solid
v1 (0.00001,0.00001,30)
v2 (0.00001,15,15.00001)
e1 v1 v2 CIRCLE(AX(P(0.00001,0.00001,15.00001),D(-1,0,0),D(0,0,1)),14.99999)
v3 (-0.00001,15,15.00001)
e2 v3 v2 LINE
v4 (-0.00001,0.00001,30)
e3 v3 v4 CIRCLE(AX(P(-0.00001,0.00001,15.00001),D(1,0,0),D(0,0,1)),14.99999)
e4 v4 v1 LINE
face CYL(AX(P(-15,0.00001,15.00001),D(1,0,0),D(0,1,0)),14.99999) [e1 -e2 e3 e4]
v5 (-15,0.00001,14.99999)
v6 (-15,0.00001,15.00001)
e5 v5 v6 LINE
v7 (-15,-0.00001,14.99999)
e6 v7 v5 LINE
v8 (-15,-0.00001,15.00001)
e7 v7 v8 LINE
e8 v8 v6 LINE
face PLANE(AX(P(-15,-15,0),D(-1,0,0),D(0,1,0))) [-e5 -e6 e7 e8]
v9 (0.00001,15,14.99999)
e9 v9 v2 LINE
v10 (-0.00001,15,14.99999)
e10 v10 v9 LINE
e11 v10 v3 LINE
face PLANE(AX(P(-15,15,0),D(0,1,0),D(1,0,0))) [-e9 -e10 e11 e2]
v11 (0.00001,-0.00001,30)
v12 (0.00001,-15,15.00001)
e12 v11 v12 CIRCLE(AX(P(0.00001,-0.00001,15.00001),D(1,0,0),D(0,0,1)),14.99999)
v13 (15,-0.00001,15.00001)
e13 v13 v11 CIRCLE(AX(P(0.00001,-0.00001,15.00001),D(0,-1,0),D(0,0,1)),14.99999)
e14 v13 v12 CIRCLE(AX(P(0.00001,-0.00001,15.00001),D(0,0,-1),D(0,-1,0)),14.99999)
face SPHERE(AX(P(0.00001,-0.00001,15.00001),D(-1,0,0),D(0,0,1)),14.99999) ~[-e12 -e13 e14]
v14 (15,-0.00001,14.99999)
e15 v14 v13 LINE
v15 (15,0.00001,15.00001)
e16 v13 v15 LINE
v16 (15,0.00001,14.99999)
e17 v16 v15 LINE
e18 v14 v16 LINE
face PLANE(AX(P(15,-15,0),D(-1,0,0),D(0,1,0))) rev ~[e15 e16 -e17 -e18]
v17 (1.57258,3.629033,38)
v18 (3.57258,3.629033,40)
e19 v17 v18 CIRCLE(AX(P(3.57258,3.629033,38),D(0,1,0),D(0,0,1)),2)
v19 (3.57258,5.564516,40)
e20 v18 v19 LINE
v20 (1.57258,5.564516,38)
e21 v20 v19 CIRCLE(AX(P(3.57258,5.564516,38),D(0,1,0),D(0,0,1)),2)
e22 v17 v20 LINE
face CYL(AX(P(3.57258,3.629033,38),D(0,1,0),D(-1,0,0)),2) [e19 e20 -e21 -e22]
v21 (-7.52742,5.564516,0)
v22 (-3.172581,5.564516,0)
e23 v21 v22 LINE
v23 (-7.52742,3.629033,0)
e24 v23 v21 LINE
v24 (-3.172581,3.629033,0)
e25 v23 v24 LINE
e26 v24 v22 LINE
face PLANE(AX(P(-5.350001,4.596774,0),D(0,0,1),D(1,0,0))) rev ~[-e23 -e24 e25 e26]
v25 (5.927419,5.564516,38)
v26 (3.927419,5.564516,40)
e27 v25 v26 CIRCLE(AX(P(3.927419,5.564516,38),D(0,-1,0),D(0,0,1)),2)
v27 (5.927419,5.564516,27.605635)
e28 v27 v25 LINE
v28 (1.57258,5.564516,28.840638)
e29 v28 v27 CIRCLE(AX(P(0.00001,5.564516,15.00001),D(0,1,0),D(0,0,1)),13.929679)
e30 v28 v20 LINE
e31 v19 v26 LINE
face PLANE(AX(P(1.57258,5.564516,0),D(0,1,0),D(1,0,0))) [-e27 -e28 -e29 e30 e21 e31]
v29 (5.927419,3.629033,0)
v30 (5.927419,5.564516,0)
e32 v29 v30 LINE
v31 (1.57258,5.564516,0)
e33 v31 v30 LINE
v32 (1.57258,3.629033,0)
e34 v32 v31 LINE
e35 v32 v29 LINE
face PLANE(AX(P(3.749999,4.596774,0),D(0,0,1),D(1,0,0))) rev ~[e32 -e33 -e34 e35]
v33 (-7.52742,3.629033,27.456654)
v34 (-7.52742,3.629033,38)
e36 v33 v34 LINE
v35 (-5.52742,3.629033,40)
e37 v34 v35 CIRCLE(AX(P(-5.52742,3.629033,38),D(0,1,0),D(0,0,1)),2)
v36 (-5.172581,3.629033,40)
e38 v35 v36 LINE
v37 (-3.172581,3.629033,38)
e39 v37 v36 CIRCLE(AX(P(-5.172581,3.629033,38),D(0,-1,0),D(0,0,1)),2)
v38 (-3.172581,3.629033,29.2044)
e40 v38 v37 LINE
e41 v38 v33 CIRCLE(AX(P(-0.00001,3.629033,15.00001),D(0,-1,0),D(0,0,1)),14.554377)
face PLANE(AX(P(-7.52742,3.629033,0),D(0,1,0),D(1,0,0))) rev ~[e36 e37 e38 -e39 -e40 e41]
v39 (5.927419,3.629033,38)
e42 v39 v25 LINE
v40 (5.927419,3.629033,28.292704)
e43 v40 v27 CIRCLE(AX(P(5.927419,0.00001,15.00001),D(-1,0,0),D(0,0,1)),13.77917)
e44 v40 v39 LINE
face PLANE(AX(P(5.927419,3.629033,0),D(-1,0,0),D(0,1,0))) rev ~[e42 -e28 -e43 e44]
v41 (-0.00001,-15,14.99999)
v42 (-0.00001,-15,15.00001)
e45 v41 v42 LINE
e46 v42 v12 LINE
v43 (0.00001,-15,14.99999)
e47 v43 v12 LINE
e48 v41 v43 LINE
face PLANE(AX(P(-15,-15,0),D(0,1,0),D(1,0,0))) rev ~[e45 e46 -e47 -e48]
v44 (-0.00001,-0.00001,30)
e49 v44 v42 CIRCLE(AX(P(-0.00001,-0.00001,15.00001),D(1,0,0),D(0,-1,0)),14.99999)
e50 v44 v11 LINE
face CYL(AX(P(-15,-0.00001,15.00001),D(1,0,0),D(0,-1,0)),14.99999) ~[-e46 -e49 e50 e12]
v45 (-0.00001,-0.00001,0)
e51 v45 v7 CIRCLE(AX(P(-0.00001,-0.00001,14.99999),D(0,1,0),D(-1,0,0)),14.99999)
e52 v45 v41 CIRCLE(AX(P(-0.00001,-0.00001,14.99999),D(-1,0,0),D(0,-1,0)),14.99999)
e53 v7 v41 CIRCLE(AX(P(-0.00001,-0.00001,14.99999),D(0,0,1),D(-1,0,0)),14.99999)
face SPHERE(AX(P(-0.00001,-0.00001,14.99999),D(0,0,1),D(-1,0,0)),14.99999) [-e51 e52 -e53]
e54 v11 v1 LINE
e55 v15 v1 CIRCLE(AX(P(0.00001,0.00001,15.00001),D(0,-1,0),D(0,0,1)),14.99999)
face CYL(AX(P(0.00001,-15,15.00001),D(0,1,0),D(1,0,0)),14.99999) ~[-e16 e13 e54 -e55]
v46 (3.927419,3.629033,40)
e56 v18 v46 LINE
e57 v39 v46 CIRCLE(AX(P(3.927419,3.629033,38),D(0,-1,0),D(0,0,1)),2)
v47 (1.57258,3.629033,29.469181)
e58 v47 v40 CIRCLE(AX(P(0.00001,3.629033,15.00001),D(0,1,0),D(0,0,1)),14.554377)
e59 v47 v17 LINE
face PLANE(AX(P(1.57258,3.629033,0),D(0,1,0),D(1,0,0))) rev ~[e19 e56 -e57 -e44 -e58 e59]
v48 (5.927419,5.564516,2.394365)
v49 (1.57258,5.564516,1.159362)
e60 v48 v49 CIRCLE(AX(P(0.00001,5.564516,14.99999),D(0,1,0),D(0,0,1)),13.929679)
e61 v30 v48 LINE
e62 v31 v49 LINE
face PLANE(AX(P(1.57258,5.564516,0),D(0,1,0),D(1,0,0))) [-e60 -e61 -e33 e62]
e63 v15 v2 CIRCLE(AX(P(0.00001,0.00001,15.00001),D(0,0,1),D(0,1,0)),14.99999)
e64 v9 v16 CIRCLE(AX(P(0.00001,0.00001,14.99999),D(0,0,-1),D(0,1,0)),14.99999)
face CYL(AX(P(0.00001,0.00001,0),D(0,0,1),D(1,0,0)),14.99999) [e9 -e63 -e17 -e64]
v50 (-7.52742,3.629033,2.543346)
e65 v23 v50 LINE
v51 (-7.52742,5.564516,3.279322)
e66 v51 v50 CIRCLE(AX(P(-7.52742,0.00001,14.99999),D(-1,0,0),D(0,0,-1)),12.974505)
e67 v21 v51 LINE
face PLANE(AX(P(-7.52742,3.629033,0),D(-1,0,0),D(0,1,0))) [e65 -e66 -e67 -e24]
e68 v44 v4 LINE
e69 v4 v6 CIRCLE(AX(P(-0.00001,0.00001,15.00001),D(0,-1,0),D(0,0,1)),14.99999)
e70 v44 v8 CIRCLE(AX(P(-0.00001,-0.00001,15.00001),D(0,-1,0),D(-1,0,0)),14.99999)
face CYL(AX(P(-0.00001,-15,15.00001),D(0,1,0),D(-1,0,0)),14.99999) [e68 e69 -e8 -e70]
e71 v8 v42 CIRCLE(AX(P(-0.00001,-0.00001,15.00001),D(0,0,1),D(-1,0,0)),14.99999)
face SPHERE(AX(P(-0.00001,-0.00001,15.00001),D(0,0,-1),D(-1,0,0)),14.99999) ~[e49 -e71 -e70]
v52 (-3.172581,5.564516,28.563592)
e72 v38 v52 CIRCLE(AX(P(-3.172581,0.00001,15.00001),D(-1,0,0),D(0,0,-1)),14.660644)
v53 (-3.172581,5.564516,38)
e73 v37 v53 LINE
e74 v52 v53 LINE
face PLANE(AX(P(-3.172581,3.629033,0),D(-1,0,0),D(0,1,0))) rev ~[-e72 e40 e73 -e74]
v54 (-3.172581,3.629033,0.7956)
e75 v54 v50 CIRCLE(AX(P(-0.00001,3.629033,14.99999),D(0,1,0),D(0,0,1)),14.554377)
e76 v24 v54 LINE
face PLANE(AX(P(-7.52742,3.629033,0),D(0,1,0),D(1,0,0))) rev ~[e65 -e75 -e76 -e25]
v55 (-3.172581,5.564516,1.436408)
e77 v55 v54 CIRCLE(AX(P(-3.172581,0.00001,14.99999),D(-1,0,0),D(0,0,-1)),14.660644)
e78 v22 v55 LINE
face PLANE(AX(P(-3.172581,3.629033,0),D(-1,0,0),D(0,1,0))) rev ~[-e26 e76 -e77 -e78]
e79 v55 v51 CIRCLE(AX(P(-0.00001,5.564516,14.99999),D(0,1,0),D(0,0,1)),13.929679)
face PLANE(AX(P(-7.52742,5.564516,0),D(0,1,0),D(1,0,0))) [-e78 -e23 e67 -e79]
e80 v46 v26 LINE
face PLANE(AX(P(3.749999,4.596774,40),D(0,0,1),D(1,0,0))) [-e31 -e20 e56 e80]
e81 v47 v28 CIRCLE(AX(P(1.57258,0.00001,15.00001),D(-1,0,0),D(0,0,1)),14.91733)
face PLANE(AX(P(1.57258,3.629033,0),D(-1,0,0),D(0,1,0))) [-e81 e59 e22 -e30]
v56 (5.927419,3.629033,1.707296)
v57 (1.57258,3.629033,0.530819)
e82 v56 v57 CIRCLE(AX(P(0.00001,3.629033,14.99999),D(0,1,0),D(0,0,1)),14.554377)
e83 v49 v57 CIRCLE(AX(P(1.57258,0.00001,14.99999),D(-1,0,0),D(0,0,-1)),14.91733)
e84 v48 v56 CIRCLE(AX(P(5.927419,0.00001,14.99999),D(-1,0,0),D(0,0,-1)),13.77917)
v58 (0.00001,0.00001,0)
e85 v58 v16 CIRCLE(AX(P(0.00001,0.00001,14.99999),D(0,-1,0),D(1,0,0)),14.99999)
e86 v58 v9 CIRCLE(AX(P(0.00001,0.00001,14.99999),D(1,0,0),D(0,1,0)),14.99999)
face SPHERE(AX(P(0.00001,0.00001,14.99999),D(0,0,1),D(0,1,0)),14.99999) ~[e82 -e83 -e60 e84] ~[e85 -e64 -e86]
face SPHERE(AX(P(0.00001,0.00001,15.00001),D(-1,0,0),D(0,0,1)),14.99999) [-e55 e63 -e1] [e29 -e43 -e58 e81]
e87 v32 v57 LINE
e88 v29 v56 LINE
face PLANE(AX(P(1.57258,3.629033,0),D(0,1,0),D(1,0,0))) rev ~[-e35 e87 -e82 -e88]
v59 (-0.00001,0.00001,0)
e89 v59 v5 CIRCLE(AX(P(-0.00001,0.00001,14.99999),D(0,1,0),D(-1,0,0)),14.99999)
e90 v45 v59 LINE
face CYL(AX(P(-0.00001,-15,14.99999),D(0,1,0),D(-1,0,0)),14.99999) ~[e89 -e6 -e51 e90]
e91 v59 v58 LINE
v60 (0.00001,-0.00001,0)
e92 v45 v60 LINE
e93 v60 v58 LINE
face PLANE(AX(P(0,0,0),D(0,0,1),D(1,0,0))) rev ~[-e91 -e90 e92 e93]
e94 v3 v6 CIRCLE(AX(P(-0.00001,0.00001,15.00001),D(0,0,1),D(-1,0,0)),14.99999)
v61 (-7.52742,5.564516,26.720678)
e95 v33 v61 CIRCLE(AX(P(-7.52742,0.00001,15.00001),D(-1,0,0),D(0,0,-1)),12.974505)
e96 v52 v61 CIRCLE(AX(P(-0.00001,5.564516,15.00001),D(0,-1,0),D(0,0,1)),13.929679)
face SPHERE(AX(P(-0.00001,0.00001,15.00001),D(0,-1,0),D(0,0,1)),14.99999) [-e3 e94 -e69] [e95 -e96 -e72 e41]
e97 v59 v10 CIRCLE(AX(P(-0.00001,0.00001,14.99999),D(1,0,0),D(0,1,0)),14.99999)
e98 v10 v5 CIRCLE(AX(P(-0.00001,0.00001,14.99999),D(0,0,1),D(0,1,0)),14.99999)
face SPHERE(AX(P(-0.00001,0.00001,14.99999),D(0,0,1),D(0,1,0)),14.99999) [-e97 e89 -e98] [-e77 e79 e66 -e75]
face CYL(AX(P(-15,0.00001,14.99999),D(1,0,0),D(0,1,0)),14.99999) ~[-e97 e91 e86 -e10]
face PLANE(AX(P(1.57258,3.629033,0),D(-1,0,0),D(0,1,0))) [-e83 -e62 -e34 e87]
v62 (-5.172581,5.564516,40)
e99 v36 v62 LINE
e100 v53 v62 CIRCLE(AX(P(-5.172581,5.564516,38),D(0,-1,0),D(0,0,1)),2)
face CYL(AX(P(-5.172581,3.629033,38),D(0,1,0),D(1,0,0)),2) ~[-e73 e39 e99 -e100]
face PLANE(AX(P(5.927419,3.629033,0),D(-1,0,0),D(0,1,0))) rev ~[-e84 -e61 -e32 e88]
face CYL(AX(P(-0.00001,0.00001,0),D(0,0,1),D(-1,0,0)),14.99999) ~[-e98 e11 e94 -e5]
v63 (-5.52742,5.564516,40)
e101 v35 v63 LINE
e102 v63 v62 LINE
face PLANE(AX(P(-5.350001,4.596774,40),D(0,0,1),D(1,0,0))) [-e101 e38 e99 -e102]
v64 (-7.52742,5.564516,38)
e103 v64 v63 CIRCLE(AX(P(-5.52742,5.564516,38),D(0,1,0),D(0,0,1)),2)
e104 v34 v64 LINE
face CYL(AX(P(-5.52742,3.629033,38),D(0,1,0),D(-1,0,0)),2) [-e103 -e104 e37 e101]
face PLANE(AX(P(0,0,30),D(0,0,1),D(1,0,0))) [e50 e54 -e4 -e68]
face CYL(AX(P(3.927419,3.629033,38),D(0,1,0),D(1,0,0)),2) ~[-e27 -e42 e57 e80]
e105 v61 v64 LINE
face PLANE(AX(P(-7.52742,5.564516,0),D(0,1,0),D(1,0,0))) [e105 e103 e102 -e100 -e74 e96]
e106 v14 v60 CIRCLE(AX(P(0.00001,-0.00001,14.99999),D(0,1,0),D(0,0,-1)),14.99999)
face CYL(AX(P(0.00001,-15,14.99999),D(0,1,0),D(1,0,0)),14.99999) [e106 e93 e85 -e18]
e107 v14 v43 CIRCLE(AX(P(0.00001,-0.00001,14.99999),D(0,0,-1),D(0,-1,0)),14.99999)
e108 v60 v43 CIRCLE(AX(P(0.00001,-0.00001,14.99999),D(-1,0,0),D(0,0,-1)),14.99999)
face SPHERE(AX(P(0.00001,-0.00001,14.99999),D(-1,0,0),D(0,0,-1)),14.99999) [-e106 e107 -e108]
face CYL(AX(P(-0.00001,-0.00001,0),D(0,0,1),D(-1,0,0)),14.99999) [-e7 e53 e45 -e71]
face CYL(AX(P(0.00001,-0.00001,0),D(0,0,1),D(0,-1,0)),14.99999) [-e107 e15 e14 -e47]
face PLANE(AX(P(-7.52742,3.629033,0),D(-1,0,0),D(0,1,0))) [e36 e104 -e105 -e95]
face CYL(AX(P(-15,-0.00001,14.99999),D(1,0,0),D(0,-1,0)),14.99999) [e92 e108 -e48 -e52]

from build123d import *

# Parameters (mm, degrees)
F0_W     = 30
F0_H     = 30
F1_DEPTH = 30
F2_R     = 14.99999
F3_W     = 4.3548396789
F3_H     = 1.9354838878
F4_DEPTH = 40
F5_R     = 2


# Not quite as in the source:
# - a fillet or chamfer is up to 0.001 mm smaller than in the source, because OpenCascade refuses the exact size
# - the program builds the solid bodies; features that only make, move or delete a surface that nothing else refers to are left out


with BuildPart() as f1:
    # F0 (on Top) → F1 (new body)
    with BuildSketch(Plane.XY):
        Rectangle(F0_W, F0_H)
    extrude(amount=F1_DEPTH)

    # F2 (radius 15 in the source; OpenCascade refuses exactly that, so slightly less here)
    f2_edges = [f1.edges().sort_by_distance(p)[0] for p in [
        (-15, -15, 15),
        (-15, 0, 30),
        (0, -15, 30),
        (0, 15, 30),
        (15, 0, 30),
        (15, 15, 15),
        (-15, 15, 15),
        (0, 15, 0),
        (-15, 0, 0),
        (0, -15, 0),
        (15, 0, 0),
        (15, -15, 15),
    ]]
    fillet(f2_edges, radius=F2_R)

    # F3 (on Top) → F4 (join)
    with BuildSketch(Plane.XY):
        with Locations((3.7499994505, 4.5967744663)):
            Rectangle(F3_W, F3_H)
        with Locations((-5.3500005495, 4.5967744663)):
            Rectangle(F3_W, F3_H)
    extrude(amount=F4_DEPTH)

    # F5
    f5_edges = [f1.edges().sort_by_distance(p)[0] for p in [
        (5.927419, 4.596774, 40),
        (-3.172581, 4.596774, 40),
        (1.57258, 4.596774, 40),
        (-7.52742, 4.596774, 40),
    ]]
    fillet(f5_edges, radius=F5_R)


solid = f1.part
